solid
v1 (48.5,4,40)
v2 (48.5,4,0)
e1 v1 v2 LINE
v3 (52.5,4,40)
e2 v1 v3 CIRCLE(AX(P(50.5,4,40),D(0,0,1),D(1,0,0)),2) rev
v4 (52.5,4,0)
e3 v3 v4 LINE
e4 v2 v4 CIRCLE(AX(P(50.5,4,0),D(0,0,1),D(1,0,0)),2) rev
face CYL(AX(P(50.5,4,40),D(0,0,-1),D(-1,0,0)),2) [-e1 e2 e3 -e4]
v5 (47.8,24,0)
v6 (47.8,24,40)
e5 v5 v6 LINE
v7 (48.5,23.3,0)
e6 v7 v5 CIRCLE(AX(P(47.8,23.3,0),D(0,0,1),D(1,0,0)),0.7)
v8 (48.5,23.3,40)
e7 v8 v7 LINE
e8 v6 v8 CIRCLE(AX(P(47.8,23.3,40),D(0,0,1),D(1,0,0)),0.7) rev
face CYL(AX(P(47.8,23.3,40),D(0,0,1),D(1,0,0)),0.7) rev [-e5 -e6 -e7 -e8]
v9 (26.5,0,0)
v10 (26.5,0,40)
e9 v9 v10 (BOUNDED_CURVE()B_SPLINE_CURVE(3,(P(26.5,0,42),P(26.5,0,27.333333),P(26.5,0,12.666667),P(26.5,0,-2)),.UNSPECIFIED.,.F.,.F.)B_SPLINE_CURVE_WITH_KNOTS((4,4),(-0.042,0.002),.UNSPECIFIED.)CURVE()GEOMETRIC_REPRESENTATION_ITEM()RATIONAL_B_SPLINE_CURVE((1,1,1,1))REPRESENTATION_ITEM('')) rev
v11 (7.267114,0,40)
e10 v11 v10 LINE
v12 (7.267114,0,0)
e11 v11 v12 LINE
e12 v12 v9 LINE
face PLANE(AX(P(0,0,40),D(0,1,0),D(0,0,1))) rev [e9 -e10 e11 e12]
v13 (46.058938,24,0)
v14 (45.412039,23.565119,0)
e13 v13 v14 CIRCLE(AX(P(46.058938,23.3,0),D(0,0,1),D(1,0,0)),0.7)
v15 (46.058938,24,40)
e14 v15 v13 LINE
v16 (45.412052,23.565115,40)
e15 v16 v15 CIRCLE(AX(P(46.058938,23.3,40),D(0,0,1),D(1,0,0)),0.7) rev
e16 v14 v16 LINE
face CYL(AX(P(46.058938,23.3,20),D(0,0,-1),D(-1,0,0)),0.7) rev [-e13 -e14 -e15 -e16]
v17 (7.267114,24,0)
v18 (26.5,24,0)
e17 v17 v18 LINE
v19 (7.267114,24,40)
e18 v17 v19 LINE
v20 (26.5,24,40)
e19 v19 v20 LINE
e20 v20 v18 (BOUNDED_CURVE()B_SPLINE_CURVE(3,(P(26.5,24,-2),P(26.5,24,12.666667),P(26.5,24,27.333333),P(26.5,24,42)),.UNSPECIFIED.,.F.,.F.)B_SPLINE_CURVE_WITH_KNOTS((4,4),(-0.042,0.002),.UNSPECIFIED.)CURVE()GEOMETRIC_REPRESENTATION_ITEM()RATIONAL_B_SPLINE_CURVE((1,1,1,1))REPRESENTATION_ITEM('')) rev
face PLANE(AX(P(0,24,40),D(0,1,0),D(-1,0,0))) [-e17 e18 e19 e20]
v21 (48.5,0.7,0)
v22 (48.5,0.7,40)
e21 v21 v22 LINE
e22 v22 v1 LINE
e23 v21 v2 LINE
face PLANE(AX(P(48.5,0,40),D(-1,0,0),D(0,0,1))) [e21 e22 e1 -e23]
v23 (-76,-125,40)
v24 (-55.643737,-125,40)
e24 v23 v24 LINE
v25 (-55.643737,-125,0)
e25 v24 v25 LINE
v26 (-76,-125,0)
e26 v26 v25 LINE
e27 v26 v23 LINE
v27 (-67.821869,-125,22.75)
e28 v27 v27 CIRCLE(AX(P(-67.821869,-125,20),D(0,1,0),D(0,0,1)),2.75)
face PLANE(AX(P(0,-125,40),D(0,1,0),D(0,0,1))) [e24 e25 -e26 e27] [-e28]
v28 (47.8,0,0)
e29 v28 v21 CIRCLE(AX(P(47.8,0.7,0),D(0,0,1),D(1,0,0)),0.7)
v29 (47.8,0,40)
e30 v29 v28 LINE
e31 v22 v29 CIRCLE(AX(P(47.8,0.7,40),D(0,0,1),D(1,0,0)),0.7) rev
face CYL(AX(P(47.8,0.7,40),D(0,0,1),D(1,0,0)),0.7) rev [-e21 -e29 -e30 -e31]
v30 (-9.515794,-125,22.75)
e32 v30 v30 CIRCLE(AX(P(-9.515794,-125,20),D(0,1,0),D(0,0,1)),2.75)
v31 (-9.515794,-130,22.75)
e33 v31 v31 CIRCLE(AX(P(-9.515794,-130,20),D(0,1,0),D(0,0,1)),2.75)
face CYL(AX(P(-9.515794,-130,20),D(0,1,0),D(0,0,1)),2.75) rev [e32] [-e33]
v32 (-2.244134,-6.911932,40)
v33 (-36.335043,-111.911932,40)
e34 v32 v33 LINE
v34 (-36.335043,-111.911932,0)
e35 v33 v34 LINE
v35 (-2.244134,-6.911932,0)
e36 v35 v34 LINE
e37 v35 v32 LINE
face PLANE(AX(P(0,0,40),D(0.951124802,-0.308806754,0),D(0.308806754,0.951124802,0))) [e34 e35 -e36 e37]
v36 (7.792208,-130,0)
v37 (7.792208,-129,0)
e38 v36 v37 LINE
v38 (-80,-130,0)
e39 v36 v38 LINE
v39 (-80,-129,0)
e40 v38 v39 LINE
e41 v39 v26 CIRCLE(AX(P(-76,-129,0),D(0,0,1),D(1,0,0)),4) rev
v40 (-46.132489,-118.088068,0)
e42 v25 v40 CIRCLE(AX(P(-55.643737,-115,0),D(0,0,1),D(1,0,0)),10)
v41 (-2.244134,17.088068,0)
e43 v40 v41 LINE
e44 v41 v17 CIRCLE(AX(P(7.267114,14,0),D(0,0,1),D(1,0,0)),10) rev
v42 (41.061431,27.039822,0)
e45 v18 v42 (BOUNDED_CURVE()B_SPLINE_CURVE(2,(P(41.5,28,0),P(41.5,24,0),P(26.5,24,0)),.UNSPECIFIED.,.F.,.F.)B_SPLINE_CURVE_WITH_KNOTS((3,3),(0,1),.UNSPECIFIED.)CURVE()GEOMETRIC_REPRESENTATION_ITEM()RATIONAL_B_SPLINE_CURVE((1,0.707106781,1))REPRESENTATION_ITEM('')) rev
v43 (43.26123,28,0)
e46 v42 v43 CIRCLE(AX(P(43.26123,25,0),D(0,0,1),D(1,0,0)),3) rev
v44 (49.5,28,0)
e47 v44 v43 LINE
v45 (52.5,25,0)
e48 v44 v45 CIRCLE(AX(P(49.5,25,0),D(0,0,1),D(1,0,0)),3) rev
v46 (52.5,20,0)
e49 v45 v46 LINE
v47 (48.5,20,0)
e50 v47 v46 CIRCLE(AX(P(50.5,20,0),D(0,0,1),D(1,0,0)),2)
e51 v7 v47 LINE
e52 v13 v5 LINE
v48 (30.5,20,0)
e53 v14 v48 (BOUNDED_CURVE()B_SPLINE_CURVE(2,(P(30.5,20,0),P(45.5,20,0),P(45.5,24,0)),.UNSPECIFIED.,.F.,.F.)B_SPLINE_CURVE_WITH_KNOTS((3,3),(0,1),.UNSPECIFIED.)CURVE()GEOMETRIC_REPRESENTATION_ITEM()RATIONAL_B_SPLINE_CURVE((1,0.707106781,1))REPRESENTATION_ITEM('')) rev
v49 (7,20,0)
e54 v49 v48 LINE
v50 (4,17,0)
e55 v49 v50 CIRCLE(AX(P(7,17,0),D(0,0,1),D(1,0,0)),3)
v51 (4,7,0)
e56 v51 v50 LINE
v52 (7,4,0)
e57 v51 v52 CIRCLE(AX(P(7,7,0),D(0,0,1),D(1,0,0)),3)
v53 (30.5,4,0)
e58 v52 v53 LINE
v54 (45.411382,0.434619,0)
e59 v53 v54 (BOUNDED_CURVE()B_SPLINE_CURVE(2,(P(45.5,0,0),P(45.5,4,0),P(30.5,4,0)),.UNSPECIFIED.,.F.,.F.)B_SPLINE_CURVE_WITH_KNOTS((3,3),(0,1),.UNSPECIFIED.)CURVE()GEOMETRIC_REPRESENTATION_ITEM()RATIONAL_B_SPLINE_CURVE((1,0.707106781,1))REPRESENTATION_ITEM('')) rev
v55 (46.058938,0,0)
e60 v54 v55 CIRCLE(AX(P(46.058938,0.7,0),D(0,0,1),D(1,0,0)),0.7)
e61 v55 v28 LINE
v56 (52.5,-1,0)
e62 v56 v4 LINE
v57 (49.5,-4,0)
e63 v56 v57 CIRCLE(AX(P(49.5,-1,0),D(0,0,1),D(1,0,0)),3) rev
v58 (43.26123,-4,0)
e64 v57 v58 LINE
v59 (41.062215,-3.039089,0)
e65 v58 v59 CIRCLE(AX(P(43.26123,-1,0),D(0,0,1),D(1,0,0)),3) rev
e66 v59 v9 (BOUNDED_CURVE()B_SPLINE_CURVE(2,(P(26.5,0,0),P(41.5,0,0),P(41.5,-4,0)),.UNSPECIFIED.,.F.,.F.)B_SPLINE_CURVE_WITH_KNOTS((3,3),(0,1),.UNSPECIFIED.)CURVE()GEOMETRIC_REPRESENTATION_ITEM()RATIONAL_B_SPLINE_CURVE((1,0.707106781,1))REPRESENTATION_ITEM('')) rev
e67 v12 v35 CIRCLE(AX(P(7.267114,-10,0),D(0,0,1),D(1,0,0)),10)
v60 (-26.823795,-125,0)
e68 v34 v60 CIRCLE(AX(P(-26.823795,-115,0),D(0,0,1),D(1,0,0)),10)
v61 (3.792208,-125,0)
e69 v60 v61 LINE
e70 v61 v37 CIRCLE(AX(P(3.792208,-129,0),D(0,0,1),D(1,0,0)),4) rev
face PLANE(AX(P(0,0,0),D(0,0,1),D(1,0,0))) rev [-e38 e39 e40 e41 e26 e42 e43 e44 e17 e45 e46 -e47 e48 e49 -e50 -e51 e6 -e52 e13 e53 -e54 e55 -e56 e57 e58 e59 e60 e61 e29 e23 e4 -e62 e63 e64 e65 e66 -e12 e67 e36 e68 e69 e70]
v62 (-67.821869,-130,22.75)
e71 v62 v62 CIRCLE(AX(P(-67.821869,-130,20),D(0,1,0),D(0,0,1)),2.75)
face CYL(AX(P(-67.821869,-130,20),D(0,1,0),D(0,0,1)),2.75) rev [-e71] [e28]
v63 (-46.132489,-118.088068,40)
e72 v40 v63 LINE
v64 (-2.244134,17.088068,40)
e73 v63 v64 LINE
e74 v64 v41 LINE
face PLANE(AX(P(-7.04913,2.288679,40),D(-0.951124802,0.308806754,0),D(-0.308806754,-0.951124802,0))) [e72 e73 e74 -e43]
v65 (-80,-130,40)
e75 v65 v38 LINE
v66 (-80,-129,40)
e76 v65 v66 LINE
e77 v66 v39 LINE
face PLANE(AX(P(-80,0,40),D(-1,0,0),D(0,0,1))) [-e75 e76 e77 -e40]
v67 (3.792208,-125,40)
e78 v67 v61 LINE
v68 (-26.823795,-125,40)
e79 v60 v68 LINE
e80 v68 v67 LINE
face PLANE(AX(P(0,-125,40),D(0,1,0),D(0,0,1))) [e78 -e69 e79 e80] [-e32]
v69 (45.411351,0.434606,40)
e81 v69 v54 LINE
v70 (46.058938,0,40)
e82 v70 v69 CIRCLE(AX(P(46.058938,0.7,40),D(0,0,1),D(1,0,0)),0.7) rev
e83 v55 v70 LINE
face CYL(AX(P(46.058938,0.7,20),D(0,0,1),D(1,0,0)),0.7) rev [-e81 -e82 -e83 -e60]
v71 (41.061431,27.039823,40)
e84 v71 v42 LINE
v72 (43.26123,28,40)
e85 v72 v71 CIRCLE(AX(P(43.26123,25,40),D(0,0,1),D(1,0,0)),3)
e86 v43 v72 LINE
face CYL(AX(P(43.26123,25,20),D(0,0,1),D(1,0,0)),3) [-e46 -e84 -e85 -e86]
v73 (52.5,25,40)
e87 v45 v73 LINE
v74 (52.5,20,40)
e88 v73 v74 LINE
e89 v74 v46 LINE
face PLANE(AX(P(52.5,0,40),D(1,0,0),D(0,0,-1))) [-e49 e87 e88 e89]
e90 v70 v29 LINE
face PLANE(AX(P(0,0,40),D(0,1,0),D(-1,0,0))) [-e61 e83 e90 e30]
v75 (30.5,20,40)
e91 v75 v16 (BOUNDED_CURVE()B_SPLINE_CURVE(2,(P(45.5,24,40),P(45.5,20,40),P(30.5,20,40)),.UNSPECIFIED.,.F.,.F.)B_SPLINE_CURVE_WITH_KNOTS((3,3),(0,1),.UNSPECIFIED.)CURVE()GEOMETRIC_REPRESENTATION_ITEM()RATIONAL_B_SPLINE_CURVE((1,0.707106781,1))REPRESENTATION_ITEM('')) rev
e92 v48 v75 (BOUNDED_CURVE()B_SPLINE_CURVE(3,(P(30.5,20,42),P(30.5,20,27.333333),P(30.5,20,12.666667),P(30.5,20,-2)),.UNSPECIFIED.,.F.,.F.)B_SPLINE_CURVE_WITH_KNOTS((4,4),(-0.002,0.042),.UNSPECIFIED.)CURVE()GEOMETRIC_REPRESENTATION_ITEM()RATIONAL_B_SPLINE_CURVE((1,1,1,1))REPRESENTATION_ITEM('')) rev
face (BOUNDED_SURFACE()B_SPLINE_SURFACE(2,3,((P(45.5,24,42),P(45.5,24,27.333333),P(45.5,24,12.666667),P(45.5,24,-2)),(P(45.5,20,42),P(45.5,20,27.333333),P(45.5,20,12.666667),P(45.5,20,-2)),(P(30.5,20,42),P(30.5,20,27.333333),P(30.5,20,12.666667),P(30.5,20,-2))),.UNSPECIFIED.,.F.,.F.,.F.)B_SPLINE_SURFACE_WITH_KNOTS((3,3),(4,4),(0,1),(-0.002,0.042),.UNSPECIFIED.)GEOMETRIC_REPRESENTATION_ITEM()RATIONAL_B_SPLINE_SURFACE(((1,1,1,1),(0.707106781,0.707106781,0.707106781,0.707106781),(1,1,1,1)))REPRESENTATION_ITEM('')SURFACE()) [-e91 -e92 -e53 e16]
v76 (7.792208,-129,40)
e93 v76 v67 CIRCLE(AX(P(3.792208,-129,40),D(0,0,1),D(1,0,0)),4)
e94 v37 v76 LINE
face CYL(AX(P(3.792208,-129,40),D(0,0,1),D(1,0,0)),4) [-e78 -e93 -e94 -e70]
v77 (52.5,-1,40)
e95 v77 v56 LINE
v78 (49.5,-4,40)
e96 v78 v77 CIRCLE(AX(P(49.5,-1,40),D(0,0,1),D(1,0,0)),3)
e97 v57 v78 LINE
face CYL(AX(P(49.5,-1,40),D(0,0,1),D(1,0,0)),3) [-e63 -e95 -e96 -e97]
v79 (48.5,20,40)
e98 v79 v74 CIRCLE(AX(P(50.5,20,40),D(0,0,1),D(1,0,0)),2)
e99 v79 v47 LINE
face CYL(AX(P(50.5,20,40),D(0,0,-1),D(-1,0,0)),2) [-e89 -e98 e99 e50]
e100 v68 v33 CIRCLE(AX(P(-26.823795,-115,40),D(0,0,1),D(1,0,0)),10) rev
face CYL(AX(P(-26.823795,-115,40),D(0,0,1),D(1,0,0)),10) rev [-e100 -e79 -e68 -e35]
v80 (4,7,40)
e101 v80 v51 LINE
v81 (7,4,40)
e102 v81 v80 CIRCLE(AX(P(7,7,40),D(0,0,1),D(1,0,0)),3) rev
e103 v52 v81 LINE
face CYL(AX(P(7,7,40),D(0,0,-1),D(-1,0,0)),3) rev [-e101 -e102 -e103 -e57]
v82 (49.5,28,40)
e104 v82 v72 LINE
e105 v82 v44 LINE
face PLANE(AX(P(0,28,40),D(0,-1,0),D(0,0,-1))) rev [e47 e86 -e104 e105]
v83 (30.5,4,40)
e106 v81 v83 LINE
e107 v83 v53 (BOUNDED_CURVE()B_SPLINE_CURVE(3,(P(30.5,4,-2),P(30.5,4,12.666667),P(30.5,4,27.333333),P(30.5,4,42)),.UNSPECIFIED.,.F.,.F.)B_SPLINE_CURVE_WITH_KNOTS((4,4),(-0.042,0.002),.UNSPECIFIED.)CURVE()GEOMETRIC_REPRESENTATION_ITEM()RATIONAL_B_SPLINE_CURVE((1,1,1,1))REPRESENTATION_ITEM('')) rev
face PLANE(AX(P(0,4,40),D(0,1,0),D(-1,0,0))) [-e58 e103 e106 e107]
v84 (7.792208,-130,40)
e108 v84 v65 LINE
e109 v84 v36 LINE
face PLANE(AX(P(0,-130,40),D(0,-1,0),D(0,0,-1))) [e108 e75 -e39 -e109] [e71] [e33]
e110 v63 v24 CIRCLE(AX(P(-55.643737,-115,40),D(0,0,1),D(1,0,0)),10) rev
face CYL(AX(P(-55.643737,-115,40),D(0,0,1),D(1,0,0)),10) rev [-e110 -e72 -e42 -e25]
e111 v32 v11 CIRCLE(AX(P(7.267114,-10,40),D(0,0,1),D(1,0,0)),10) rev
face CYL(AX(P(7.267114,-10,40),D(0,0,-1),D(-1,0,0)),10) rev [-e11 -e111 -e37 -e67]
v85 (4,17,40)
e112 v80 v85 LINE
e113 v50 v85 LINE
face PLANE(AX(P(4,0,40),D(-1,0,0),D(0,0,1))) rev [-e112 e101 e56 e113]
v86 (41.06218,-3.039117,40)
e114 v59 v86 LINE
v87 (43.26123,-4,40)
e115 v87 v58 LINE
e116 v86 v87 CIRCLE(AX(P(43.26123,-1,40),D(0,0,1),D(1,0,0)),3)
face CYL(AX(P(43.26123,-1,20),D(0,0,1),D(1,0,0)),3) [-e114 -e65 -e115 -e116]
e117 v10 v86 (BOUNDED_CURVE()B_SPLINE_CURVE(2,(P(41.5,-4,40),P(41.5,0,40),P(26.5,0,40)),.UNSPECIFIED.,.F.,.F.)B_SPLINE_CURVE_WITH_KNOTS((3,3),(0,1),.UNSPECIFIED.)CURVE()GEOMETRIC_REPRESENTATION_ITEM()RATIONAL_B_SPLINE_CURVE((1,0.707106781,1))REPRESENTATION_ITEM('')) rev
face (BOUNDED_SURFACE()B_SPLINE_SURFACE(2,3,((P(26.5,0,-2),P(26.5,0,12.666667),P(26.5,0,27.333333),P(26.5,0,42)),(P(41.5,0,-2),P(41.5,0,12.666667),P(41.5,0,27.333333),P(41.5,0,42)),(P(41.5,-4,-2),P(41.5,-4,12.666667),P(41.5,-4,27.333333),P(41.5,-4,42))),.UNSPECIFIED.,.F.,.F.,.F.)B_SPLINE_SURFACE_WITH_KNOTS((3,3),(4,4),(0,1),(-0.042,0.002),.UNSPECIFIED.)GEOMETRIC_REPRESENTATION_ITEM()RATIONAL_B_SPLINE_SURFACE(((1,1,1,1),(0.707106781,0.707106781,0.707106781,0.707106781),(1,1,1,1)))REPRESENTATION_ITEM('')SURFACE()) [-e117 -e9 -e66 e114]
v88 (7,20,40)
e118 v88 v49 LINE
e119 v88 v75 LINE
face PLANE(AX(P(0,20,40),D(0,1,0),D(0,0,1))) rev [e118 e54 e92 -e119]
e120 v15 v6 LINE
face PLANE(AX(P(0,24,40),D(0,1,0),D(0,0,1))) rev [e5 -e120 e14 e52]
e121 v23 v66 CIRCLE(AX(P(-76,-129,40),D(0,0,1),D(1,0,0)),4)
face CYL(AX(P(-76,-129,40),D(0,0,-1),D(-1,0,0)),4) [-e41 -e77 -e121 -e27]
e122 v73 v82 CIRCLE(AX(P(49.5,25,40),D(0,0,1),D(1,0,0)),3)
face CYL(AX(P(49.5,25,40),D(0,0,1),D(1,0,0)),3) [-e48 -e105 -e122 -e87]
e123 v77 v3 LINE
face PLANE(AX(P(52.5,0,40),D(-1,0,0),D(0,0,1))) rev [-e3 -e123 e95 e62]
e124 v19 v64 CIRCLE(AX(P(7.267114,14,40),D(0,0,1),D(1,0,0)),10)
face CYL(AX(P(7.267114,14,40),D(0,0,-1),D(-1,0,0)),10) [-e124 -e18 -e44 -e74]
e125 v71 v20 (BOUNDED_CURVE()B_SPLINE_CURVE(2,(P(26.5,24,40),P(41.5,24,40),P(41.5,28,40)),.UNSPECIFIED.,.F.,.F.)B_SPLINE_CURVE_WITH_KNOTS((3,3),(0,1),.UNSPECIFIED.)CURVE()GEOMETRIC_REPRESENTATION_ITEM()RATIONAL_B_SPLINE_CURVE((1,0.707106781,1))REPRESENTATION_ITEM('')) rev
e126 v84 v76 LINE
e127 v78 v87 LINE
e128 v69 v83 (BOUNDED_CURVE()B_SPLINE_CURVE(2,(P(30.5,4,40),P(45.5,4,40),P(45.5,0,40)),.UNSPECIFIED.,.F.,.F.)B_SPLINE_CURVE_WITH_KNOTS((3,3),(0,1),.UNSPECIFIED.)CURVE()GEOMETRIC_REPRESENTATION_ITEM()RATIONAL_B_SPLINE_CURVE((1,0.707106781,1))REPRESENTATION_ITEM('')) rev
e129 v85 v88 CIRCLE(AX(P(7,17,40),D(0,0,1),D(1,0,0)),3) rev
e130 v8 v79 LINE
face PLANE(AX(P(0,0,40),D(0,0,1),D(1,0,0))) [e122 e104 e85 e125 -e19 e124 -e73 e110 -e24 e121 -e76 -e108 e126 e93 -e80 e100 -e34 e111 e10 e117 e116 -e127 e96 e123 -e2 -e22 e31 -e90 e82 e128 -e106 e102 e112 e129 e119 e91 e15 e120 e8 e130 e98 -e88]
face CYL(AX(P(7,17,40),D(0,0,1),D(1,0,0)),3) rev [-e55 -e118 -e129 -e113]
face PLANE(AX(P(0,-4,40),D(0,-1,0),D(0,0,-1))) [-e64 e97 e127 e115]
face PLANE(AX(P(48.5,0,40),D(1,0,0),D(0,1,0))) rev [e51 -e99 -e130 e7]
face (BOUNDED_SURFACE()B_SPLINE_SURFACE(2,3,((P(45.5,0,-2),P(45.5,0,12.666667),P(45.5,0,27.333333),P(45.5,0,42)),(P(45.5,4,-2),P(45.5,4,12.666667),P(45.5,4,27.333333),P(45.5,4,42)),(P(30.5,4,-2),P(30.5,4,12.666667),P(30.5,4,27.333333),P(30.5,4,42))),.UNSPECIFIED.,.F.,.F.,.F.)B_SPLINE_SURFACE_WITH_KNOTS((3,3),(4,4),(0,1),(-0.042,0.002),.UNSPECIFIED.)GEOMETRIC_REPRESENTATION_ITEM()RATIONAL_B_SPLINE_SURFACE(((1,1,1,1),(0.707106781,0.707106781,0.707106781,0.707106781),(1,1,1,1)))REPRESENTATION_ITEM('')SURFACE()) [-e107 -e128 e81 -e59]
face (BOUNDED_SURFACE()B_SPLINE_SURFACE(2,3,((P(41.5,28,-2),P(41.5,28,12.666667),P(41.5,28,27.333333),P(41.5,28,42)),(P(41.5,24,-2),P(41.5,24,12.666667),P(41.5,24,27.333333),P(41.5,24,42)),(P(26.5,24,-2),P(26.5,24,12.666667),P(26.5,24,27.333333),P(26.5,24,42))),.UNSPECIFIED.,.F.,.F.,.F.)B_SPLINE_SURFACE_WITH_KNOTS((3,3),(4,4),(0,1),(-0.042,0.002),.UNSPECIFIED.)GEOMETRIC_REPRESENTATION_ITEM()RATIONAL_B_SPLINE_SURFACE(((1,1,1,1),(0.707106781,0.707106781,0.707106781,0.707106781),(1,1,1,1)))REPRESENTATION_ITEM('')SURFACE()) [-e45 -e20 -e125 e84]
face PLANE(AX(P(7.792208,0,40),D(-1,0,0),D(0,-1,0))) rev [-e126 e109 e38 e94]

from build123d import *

# Parameters (mm, degrees)
BOSS_EXTRUDE1_DEPTH = 40
FILLET2_SIZE        = 15
FILLET2_SIZE_2      = 4
FILLET3_SIZE        = 15
FILLET3_SIZE_2      = 4
FILLET4_SIZE        = 15
FILLET4_SIZE_2      = 4
FILLET5_SIZE        = 4
FILLET5_SIZE_2      = 15
FILLET6_R           = 3
FILLET7_R           = 3
FILLET8_R           = 0.7
FILLET9_R           = 10
FILLET10_R          = 10
SKETCH2_R           = 2.75
CUT_EXTRUDE1_DEPTH  = 178.22584477
FILLET11_R          = 4


with BuildPart() as part:
    # Sketch1 → Boss-Extrude1 (new body)
    with BuildSketch(Plane.XY):
        with BuildLine():
            Line((41.5, 24), (0, 24))
            Line((0, 24), (-48.376623377, -125))
            Line((-48.376623377, -125), (-80, -125))
            Line((-80, -125), (-80, -130))
            Line((-80, -130), (7.792207792, -130))
            Line((7.792207792, -130), (7.792207792, -125))
            Line((7.792207792, -125), (-40.584415584, -125))
            Line((-40.584415584, -125), (0, 0))
            Line((0, 0), (41.5, 0))
            Line((41.5, 0), (41.5, -4))
            Line((41.5, -4), (52.5, -4))
            Line((52.5, -4), (52.5, 4))
            ThreePointArc((52.5, 4), (50.5, 6), (48.5, 4))
            Line((48.5, 4), (48.5, 0))
            Line((48.5, 0), (45.5, 0))
            Line((45.5, 0), (45.5, 4))
            Line((45.5, 4), (4, 4))
            Line((4, 4), (4, 20))
            Line((4, 20), (45.5, 20))
            Line((45.5, 20), (45.5, 24))
            Line((45.5, 24), (48.5, 24))
            Line((48.5, 24), (48.5, 20))
            ThreePointArc((48.5, 20), (50.5, 18), (52.5, 20))
            Line((52.5, 20), (52.5, 28))
            Line((52.5, 28), (41.5, 28))
            Line((41.5, 28), (41.5, 24))
        make_face()
    extrude(amount=BOSS_EXTRUDE1_DEPTH)

    # Fillet2
    # an asymmetric fillet: 15, 4 mm, written as the material it takes off along each edge
    with BuildSketch(Plane(origin=(45.5, 20, -37.5), x_dir=(-1, 0, 0), z_dir=(0, 0, 1))) as fillet2_piece_1:
        with BuildLine():
            Bezier((FILLET2_SIZE, 0), (0, 0), (0, -FILLET2_SIZE_2), weights=[1, 0.707106781, 1])
            Line((0, -FILLET2_SIZE_2), (0, 0))
            Line((0, 0), (FILLET2_SIZE, 0))
        make_face()
    extrude(amount=115, mode=Mode.SUBTRACT)

    # Fillet3
    # an asymmetric fillet: 15, 4 mm, written as the material it takes off along each edge
    with BuildSketch(Plane(origin=(45.5, 4, -37.5), x_dir=(-1, 0, 0), z_dir=(0, 0, 1))) as fillet3_piece_1:
        with BuildLine():
            Bezier((FILLET3_SIZE, 0), (0, 0), (0, FILLET3_SIZE_2), weights=[1, 0.707106781, 1])
            Line((0, FILLET3_SIZE_2), (0, 0))
            Line((0, 0), (FILLET3_SIZE, 0))
        make_face()
    extrude(amount=115, mode=Mode.SUBTRACT)

    # Fillet4
    # an asymmetric fillet: 15, 4 mm, written as the material it adds along each edge
    with BuildSketch(Plane(origin=(41.5, 24, 0), x_dir=(-1, 0, 0), z_dir=(0, 0, 1))) as fillet4_piece_1:
        with BuildLine():
            Bezier((FILLET4_SIZE, 0), (0, 0), (0, -FILLET4_SIZE_2), weights=[1, 0.707106781, 1])
            Line((0, -FILLET4_SIZE_2), (0, 0))
            Line((0, 0), (FILLET4_SIZE, 0))
        make_face()
    extrude(amount=40)

    # Fillet5
    # an asymmetric fillet: 15, 4 mm, written as the material it adds along each edge
    with BuildSketch(Plane(origin=(41.5, 0, 0), x_dir=(0, -1, 0), z_dir=(0, 0, 1))) as fillet5_piece_1:
        with BuildLine():
            Bezier((FILLET5_SIZE, 0), (0, 0), (0, -FILLET5_SIZE_2), weights=[1, 0.707106781, 1])
            Line((0, -FILLET5_SIZE_2), (0, 0))
            Line((0, 0), (FILLET5_SIZE, 0))
        make_face()
    extrude(amount=40)

    # Fillet6
    fillet6_edges = [part.edges().sort_by_distance(p)[0] for p in [
        (4, 4, 20),
        (4, 20, 20),
    ]]
    fillet(fillet6_edges, radius=FILLET6_R)

    # Fillet7
    fillet7_edges = [part.edges().sort_by_distance(p)[0] for p in [
        (52.5, -4, 20),
        (41.5, -4, 20),
        (41.5, 28, 20),
        (52.5, 28, 20),
    ]]
    fillet(fillet7_edges, radius=FILLET7_R)

    # Fillet8
    fillet8_edges = [part.edges().sort_by_distance(p)[0] for p in [
        (45.5, 0, 20),
        (48.5, 0, 20),
        (48.5, 24, 20),
        (45.5, 24, 20),
    ]]
    fillet(fillet8_edges, radius=FILLET8_R)

    # Fillet9
    fillet9_edges = [part.edges().sort_by_distance(p)[0] for p in [
        (0, 0, 20),
        (0, 24, 20),
    ]]
    fillet(fillet9_edges, radius=FILLET9_R)

    # Fillet10
    fillet10_edges = [part.edges().sort_by_distance(p)[0] for p in [
        (-48.376623377, -125, 20),
        (-40.584415584, -125, 20),
    ]]
    fillet(fillet10_edges, radius=FILLET10_R)

    # Sketch2 → Cut-Extrude1 (cut, through all)
    with BuildSketch(Plane(origin=(0, -125, 0), x_dir=(1, 0, 0), z_dir=(0, 1, 0))):
        with Locations(Location((-67.82186874, -20, 0), (0, 0, 270))):
            Circle(SKETCH2_R)
        with Locations(Location((-9.515793598, -20, 0), (0, 0, 270))):
            Circle(SKETCH2_R)
    extrude(amount=-CUT_EXTRUDE1_DEPTH, mode=Mode.SUBTRACT)

    # Fillet11
    fillet11_edges = [part.edges().sort_by_distance(p)[0] for p in [
        (7.792207792, -125, 20),
        (-80, -125, 20),
    ]]
    fillet(fillet11_edges, radius=FILLET11_R)


solid = part.part
